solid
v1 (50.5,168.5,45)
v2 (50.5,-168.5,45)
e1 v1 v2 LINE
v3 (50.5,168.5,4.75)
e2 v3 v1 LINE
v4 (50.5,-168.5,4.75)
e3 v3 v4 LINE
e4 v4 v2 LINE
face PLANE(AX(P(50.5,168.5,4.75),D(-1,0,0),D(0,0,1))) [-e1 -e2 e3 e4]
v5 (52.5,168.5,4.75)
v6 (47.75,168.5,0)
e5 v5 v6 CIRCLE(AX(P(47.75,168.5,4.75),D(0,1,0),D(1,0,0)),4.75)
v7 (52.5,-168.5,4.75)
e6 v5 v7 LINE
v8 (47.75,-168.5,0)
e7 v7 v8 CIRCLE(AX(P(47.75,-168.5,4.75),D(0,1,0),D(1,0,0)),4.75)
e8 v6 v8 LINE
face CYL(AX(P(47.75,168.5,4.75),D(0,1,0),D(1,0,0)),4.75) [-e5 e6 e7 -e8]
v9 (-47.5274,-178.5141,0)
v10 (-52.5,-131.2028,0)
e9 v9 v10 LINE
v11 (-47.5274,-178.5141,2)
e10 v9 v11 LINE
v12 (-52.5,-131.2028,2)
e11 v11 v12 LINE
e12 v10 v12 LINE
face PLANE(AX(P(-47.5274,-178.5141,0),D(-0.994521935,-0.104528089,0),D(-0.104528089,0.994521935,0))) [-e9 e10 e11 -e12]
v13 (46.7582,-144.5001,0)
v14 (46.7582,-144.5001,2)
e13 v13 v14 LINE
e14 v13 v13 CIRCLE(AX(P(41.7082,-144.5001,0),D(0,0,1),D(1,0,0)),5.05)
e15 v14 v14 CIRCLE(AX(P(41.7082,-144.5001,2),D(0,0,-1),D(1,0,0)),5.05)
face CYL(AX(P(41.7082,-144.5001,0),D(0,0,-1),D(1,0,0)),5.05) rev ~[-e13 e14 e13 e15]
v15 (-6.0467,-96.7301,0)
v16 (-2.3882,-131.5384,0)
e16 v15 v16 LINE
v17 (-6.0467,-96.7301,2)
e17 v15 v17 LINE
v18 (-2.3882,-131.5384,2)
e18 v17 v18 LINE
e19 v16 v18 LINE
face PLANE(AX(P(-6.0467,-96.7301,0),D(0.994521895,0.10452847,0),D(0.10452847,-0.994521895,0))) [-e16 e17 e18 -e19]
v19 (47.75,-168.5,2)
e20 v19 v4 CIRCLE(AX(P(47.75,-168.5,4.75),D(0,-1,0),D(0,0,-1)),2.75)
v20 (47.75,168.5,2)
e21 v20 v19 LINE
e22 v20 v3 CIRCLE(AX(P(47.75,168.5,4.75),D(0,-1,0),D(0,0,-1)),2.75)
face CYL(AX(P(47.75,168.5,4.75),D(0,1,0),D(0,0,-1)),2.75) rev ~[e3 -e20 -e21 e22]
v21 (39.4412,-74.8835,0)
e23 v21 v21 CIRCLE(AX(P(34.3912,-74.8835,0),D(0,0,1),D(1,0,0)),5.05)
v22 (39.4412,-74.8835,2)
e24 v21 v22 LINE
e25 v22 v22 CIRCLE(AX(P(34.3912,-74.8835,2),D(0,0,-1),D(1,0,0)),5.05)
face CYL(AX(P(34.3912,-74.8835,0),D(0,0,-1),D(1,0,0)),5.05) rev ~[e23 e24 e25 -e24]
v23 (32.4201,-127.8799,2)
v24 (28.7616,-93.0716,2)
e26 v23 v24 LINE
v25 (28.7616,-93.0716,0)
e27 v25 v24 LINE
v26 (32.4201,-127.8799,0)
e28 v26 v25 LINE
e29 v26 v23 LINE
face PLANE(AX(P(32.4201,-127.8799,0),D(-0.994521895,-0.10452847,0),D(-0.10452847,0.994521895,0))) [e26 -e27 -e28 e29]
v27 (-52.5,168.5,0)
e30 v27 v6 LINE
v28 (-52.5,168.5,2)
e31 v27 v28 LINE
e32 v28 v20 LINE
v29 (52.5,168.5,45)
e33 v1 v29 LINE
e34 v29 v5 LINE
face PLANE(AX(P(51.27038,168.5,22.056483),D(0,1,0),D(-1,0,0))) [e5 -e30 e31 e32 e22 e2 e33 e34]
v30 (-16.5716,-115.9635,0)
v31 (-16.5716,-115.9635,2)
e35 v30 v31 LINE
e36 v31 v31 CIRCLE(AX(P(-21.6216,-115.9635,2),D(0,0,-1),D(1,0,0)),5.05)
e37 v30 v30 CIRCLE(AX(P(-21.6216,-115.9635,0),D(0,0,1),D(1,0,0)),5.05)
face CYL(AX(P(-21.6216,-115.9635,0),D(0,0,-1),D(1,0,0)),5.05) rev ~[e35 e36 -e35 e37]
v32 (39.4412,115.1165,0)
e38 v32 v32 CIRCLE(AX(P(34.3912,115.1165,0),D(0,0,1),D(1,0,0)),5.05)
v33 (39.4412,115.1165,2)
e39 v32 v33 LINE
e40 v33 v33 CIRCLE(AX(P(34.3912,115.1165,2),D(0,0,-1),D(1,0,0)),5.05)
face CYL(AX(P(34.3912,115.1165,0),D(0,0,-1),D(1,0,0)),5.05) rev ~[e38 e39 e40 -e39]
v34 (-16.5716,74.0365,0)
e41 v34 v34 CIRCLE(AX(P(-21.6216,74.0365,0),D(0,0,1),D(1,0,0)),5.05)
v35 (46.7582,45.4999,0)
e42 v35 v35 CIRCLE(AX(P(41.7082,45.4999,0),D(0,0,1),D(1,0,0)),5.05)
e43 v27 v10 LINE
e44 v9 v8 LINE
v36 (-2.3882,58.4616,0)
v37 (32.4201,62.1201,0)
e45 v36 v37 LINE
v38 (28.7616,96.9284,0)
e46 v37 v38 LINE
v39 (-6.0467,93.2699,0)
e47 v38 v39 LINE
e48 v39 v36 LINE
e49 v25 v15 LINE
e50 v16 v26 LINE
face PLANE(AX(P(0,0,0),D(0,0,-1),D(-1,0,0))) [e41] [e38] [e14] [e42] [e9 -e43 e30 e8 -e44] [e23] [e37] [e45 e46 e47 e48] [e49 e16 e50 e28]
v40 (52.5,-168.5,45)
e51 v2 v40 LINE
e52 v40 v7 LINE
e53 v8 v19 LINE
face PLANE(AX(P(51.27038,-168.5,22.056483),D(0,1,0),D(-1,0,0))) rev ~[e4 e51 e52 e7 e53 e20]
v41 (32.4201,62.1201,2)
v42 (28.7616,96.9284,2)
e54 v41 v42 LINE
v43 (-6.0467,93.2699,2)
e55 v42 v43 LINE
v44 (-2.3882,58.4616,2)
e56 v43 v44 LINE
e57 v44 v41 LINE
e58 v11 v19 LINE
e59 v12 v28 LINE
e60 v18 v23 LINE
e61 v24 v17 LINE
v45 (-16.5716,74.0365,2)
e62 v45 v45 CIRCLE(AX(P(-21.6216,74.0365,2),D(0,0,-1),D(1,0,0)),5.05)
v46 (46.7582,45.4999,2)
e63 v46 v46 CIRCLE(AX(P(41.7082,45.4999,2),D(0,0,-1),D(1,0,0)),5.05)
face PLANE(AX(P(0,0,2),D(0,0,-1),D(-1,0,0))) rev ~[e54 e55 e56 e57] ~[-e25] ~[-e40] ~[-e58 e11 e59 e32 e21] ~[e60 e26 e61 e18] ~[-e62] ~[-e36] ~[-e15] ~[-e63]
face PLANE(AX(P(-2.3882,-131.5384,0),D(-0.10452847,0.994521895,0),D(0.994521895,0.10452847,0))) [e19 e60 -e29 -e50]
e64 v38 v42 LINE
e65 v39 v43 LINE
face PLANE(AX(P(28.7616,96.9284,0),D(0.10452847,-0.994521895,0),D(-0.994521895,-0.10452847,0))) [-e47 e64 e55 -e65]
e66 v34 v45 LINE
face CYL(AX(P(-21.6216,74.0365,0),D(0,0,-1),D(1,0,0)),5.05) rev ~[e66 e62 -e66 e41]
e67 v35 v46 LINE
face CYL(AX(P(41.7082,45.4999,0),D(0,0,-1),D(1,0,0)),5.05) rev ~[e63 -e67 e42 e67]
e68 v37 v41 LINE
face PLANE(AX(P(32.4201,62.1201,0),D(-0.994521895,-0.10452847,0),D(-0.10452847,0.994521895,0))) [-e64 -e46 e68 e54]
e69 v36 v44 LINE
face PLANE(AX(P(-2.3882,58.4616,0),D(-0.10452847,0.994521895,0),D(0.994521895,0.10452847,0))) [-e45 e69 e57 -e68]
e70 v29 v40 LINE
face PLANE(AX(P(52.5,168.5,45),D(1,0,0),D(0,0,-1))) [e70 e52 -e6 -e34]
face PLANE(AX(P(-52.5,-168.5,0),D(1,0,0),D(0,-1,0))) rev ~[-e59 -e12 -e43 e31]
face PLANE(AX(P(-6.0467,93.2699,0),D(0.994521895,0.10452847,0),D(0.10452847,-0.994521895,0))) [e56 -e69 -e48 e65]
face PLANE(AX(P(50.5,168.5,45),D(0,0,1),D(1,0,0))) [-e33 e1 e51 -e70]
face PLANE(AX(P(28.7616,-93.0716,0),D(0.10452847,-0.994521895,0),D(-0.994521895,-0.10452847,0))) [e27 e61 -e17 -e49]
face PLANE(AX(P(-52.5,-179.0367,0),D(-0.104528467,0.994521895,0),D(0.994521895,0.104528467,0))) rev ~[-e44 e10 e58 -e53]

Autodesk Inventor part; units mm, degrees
ref_plane "YZ Plane" through (0, 0, 0) normal (1, 0, 0) x (0, 1, 0)
ref_plane "XZ Plane" through (0, 0, 0) normal (0, 1, 0) x (-1, 0, 0)
ref_plane "XY Plane" through (0, 0, 0) normal (0, 0, 1) x (1, 0, 0)
sketch "Sketch1" plane through (0, 0, 0) normal (0, 0, 1) x (1, 0, 0)
  line L0 (-52.5, 168.5) -> (52.5, 168.5)
  line L1 (52.5, 168.5) -> (52.5, -168.5)
  line L2 (52.5, -168.5) -> (-52.5, -168.5)
  line L3 (-52.5, -168.5) -> (-52.5, 168.5)
  line L4 (-52.5, 168.5) -> (52.5, -168.5) construction
  point P0 (0, 0)
  point P1 (0, 0)
  dimension "d0" = 105
  dimension "d1" = 337
extrude "Plate1" add sketch "Sketch1" along normal blind 2
sketch "Sketch4" plane through (50.5, 168.5, 0) normal (1, 0, 0) x (0, 1, 0)
  line L0 (-337, 0) -> (0, 0)
  line L1 (0, 0) -> (0, 45)
  line L2 (0, 45) -> (-337, 45)
  line L3 (-337, 45) -> (-337, 0)
edge flange "Flange1" height 45 angle 90 thickness 2 bend radius 2.75 thickness toward (1, 0, 0) relief round relief width 2 relief depth 1 edges at (52.5, 0, 2) wall of the first edge with corners at (50.5, -168.5, 0) (50.5, 168.5, 0) (50.5, 168.5, 45) (50.5, -168.5, 45)
bend "Bend1"
corner "Corner1"
sketch "Sketch5" plane through (0, 0, 0) normal (0, 0, -1) x (-1, 0, 0)
  line L0 (-47.75, 168.5) -> (-47.75, -168.5) projected
  line L1 (52.5, -168.5) -> (-47.75, -168.5) projected
  line L2 (52.5, 168.5) -> (52.5, -168.5) projected
  line L3 (-47.75, 168.5) -> (52.5, 168.5) projected
  line L4 (52.5, -168.5) -> (52.5, -179.0367)
  line L5 (-47.75, -168.5) -> (52.5, -168.5) projected
  line L6 (52.5, -179.0367) -> (-47.75, -168.5)
  point P0 (0, 0)
  dimension "d25" = 6
extrude "Extrusion2" add sketch "Sketch5" against normal up to surface (2 mm away) contours L1 L4 L6
sketch "Sketch6" plane through (0, 0, 0) normal (0, 0, -1) x (-1, 0, 0)
  line L0 (-47.75, 168.5) -> (-47.75, -168.5) construction
  line L1 (-47.75, -168.5) -> (52.5, -179.0367) projected
  line L2 (52.5, 168.5) -> (52.5, -179.0367) projected
  line L3 (-47.75, 168.5) -> (52.5, 168.5) construction
  line L4 (47.5274, -178.5141) -> (52.5, -131.2028)
  line L5 (-47.75, -168.5) -> (52.5, -179.0367) projected
  point P0 (0, 0)
  dimension "d29" = 5
extrude "Cut1" cut sketch "Sketch6" against normal blind 2
sketch "Sketch7" plane through (0, 0, 0) normal (0, 0, 1) x (1, 0, 0)
  line L0 (47.75, -168.5) -> (-47.5274, -178.5141) projected
  circle A0 centre (41.7082, -144.5001) radius 5.05
  line L1 (41.7082, -144.5001) -> (34.3912, -74.8835) construction
  line L2 (32.4201, -127.8799) -> (28.7616, -93.0716)
  circle A1 centre (34.3912, -74.8835) radius 5.05
  line L3 (-21.6216, -115.9635) -> (41.7082, -144.5001) construction
  line L4 (32.4201, -127.8799) -> (-6.0467, -96.7301) construction
  line L5 (28.7616, -93.0716) -> (-6.0467, -96.7301)
  line L6 (-2.3882, -131.5384) -> (32.4201, -127.8799)
  line L7 (28.7616, -93.0716) -> (-2.3882, -131.5384) construction
  line L8 (-6.0467, -96.7301) -> (-2.3882, -131.5384)
  line L9 (30.5908, -110.4758) -> (-21.6216, -115.9635) construction
  line L10 (34.3912, -74.8835) -> (-21.6216, -115.9635) construction
  circle A2 centre (-21.6216, -115.9635) radius 5.05
  point P0 (0, 0)
  point P1 (13.1867, -112.305)
  dimension "d32" = 35
  dimension "d33" = 35
  dimension "d34" = 10.1
  dimension "d35" = 70
  dimension "d36" = 60
  dimension "d37" = 25
  dimension "d38" = 11
  dimension "d39" = 42
extrude "Extrusion3" cut sketch "Sketch7" along normal through all
pattern_linear "Rectangular Pattern1" count 2 spacing 190 along (0, 1, 0) of "Extrusion3"
equation "\"d30\" = Thickness"
equation "\"d33\" = d32"
equation "\"d2\" = Thickness"
equation "\"d15\" = BendReliefWidth"
equation "\"d16\" = BendReliefDepth"
equation "\"d17\" = MinimumRemnant"
equation "\"d18\" = TransitionRadius"
equation "\"d21\" = BendRadius"
equation "\"d22\" = CornerReliefSize"
equation "\"d23\" = GapSize"
equation "\"d24\" = JacobiRadiusSize"
equation "\"BendReliefWidth\" = Thickness"
equation "\"BendReliefDepth\" = 0.5 * Thickness"
equation "\"CornerReliefSize\" = 4 * Thickness"
equation "\"MinimumRemnant\" = 2 * Thickness"
equation "\"TransitionRadius\" = BendRadius"
equation "\"JacobiRadiusSize\" = BendRadius"
equation "\"GapSize\" = Thickness"
equation "\"Thickness\" = 2"
equation "\"BendRadius\" = 2.75"
properties part number "MNT-CDF-603 CAP" material "Stainless Steel"
